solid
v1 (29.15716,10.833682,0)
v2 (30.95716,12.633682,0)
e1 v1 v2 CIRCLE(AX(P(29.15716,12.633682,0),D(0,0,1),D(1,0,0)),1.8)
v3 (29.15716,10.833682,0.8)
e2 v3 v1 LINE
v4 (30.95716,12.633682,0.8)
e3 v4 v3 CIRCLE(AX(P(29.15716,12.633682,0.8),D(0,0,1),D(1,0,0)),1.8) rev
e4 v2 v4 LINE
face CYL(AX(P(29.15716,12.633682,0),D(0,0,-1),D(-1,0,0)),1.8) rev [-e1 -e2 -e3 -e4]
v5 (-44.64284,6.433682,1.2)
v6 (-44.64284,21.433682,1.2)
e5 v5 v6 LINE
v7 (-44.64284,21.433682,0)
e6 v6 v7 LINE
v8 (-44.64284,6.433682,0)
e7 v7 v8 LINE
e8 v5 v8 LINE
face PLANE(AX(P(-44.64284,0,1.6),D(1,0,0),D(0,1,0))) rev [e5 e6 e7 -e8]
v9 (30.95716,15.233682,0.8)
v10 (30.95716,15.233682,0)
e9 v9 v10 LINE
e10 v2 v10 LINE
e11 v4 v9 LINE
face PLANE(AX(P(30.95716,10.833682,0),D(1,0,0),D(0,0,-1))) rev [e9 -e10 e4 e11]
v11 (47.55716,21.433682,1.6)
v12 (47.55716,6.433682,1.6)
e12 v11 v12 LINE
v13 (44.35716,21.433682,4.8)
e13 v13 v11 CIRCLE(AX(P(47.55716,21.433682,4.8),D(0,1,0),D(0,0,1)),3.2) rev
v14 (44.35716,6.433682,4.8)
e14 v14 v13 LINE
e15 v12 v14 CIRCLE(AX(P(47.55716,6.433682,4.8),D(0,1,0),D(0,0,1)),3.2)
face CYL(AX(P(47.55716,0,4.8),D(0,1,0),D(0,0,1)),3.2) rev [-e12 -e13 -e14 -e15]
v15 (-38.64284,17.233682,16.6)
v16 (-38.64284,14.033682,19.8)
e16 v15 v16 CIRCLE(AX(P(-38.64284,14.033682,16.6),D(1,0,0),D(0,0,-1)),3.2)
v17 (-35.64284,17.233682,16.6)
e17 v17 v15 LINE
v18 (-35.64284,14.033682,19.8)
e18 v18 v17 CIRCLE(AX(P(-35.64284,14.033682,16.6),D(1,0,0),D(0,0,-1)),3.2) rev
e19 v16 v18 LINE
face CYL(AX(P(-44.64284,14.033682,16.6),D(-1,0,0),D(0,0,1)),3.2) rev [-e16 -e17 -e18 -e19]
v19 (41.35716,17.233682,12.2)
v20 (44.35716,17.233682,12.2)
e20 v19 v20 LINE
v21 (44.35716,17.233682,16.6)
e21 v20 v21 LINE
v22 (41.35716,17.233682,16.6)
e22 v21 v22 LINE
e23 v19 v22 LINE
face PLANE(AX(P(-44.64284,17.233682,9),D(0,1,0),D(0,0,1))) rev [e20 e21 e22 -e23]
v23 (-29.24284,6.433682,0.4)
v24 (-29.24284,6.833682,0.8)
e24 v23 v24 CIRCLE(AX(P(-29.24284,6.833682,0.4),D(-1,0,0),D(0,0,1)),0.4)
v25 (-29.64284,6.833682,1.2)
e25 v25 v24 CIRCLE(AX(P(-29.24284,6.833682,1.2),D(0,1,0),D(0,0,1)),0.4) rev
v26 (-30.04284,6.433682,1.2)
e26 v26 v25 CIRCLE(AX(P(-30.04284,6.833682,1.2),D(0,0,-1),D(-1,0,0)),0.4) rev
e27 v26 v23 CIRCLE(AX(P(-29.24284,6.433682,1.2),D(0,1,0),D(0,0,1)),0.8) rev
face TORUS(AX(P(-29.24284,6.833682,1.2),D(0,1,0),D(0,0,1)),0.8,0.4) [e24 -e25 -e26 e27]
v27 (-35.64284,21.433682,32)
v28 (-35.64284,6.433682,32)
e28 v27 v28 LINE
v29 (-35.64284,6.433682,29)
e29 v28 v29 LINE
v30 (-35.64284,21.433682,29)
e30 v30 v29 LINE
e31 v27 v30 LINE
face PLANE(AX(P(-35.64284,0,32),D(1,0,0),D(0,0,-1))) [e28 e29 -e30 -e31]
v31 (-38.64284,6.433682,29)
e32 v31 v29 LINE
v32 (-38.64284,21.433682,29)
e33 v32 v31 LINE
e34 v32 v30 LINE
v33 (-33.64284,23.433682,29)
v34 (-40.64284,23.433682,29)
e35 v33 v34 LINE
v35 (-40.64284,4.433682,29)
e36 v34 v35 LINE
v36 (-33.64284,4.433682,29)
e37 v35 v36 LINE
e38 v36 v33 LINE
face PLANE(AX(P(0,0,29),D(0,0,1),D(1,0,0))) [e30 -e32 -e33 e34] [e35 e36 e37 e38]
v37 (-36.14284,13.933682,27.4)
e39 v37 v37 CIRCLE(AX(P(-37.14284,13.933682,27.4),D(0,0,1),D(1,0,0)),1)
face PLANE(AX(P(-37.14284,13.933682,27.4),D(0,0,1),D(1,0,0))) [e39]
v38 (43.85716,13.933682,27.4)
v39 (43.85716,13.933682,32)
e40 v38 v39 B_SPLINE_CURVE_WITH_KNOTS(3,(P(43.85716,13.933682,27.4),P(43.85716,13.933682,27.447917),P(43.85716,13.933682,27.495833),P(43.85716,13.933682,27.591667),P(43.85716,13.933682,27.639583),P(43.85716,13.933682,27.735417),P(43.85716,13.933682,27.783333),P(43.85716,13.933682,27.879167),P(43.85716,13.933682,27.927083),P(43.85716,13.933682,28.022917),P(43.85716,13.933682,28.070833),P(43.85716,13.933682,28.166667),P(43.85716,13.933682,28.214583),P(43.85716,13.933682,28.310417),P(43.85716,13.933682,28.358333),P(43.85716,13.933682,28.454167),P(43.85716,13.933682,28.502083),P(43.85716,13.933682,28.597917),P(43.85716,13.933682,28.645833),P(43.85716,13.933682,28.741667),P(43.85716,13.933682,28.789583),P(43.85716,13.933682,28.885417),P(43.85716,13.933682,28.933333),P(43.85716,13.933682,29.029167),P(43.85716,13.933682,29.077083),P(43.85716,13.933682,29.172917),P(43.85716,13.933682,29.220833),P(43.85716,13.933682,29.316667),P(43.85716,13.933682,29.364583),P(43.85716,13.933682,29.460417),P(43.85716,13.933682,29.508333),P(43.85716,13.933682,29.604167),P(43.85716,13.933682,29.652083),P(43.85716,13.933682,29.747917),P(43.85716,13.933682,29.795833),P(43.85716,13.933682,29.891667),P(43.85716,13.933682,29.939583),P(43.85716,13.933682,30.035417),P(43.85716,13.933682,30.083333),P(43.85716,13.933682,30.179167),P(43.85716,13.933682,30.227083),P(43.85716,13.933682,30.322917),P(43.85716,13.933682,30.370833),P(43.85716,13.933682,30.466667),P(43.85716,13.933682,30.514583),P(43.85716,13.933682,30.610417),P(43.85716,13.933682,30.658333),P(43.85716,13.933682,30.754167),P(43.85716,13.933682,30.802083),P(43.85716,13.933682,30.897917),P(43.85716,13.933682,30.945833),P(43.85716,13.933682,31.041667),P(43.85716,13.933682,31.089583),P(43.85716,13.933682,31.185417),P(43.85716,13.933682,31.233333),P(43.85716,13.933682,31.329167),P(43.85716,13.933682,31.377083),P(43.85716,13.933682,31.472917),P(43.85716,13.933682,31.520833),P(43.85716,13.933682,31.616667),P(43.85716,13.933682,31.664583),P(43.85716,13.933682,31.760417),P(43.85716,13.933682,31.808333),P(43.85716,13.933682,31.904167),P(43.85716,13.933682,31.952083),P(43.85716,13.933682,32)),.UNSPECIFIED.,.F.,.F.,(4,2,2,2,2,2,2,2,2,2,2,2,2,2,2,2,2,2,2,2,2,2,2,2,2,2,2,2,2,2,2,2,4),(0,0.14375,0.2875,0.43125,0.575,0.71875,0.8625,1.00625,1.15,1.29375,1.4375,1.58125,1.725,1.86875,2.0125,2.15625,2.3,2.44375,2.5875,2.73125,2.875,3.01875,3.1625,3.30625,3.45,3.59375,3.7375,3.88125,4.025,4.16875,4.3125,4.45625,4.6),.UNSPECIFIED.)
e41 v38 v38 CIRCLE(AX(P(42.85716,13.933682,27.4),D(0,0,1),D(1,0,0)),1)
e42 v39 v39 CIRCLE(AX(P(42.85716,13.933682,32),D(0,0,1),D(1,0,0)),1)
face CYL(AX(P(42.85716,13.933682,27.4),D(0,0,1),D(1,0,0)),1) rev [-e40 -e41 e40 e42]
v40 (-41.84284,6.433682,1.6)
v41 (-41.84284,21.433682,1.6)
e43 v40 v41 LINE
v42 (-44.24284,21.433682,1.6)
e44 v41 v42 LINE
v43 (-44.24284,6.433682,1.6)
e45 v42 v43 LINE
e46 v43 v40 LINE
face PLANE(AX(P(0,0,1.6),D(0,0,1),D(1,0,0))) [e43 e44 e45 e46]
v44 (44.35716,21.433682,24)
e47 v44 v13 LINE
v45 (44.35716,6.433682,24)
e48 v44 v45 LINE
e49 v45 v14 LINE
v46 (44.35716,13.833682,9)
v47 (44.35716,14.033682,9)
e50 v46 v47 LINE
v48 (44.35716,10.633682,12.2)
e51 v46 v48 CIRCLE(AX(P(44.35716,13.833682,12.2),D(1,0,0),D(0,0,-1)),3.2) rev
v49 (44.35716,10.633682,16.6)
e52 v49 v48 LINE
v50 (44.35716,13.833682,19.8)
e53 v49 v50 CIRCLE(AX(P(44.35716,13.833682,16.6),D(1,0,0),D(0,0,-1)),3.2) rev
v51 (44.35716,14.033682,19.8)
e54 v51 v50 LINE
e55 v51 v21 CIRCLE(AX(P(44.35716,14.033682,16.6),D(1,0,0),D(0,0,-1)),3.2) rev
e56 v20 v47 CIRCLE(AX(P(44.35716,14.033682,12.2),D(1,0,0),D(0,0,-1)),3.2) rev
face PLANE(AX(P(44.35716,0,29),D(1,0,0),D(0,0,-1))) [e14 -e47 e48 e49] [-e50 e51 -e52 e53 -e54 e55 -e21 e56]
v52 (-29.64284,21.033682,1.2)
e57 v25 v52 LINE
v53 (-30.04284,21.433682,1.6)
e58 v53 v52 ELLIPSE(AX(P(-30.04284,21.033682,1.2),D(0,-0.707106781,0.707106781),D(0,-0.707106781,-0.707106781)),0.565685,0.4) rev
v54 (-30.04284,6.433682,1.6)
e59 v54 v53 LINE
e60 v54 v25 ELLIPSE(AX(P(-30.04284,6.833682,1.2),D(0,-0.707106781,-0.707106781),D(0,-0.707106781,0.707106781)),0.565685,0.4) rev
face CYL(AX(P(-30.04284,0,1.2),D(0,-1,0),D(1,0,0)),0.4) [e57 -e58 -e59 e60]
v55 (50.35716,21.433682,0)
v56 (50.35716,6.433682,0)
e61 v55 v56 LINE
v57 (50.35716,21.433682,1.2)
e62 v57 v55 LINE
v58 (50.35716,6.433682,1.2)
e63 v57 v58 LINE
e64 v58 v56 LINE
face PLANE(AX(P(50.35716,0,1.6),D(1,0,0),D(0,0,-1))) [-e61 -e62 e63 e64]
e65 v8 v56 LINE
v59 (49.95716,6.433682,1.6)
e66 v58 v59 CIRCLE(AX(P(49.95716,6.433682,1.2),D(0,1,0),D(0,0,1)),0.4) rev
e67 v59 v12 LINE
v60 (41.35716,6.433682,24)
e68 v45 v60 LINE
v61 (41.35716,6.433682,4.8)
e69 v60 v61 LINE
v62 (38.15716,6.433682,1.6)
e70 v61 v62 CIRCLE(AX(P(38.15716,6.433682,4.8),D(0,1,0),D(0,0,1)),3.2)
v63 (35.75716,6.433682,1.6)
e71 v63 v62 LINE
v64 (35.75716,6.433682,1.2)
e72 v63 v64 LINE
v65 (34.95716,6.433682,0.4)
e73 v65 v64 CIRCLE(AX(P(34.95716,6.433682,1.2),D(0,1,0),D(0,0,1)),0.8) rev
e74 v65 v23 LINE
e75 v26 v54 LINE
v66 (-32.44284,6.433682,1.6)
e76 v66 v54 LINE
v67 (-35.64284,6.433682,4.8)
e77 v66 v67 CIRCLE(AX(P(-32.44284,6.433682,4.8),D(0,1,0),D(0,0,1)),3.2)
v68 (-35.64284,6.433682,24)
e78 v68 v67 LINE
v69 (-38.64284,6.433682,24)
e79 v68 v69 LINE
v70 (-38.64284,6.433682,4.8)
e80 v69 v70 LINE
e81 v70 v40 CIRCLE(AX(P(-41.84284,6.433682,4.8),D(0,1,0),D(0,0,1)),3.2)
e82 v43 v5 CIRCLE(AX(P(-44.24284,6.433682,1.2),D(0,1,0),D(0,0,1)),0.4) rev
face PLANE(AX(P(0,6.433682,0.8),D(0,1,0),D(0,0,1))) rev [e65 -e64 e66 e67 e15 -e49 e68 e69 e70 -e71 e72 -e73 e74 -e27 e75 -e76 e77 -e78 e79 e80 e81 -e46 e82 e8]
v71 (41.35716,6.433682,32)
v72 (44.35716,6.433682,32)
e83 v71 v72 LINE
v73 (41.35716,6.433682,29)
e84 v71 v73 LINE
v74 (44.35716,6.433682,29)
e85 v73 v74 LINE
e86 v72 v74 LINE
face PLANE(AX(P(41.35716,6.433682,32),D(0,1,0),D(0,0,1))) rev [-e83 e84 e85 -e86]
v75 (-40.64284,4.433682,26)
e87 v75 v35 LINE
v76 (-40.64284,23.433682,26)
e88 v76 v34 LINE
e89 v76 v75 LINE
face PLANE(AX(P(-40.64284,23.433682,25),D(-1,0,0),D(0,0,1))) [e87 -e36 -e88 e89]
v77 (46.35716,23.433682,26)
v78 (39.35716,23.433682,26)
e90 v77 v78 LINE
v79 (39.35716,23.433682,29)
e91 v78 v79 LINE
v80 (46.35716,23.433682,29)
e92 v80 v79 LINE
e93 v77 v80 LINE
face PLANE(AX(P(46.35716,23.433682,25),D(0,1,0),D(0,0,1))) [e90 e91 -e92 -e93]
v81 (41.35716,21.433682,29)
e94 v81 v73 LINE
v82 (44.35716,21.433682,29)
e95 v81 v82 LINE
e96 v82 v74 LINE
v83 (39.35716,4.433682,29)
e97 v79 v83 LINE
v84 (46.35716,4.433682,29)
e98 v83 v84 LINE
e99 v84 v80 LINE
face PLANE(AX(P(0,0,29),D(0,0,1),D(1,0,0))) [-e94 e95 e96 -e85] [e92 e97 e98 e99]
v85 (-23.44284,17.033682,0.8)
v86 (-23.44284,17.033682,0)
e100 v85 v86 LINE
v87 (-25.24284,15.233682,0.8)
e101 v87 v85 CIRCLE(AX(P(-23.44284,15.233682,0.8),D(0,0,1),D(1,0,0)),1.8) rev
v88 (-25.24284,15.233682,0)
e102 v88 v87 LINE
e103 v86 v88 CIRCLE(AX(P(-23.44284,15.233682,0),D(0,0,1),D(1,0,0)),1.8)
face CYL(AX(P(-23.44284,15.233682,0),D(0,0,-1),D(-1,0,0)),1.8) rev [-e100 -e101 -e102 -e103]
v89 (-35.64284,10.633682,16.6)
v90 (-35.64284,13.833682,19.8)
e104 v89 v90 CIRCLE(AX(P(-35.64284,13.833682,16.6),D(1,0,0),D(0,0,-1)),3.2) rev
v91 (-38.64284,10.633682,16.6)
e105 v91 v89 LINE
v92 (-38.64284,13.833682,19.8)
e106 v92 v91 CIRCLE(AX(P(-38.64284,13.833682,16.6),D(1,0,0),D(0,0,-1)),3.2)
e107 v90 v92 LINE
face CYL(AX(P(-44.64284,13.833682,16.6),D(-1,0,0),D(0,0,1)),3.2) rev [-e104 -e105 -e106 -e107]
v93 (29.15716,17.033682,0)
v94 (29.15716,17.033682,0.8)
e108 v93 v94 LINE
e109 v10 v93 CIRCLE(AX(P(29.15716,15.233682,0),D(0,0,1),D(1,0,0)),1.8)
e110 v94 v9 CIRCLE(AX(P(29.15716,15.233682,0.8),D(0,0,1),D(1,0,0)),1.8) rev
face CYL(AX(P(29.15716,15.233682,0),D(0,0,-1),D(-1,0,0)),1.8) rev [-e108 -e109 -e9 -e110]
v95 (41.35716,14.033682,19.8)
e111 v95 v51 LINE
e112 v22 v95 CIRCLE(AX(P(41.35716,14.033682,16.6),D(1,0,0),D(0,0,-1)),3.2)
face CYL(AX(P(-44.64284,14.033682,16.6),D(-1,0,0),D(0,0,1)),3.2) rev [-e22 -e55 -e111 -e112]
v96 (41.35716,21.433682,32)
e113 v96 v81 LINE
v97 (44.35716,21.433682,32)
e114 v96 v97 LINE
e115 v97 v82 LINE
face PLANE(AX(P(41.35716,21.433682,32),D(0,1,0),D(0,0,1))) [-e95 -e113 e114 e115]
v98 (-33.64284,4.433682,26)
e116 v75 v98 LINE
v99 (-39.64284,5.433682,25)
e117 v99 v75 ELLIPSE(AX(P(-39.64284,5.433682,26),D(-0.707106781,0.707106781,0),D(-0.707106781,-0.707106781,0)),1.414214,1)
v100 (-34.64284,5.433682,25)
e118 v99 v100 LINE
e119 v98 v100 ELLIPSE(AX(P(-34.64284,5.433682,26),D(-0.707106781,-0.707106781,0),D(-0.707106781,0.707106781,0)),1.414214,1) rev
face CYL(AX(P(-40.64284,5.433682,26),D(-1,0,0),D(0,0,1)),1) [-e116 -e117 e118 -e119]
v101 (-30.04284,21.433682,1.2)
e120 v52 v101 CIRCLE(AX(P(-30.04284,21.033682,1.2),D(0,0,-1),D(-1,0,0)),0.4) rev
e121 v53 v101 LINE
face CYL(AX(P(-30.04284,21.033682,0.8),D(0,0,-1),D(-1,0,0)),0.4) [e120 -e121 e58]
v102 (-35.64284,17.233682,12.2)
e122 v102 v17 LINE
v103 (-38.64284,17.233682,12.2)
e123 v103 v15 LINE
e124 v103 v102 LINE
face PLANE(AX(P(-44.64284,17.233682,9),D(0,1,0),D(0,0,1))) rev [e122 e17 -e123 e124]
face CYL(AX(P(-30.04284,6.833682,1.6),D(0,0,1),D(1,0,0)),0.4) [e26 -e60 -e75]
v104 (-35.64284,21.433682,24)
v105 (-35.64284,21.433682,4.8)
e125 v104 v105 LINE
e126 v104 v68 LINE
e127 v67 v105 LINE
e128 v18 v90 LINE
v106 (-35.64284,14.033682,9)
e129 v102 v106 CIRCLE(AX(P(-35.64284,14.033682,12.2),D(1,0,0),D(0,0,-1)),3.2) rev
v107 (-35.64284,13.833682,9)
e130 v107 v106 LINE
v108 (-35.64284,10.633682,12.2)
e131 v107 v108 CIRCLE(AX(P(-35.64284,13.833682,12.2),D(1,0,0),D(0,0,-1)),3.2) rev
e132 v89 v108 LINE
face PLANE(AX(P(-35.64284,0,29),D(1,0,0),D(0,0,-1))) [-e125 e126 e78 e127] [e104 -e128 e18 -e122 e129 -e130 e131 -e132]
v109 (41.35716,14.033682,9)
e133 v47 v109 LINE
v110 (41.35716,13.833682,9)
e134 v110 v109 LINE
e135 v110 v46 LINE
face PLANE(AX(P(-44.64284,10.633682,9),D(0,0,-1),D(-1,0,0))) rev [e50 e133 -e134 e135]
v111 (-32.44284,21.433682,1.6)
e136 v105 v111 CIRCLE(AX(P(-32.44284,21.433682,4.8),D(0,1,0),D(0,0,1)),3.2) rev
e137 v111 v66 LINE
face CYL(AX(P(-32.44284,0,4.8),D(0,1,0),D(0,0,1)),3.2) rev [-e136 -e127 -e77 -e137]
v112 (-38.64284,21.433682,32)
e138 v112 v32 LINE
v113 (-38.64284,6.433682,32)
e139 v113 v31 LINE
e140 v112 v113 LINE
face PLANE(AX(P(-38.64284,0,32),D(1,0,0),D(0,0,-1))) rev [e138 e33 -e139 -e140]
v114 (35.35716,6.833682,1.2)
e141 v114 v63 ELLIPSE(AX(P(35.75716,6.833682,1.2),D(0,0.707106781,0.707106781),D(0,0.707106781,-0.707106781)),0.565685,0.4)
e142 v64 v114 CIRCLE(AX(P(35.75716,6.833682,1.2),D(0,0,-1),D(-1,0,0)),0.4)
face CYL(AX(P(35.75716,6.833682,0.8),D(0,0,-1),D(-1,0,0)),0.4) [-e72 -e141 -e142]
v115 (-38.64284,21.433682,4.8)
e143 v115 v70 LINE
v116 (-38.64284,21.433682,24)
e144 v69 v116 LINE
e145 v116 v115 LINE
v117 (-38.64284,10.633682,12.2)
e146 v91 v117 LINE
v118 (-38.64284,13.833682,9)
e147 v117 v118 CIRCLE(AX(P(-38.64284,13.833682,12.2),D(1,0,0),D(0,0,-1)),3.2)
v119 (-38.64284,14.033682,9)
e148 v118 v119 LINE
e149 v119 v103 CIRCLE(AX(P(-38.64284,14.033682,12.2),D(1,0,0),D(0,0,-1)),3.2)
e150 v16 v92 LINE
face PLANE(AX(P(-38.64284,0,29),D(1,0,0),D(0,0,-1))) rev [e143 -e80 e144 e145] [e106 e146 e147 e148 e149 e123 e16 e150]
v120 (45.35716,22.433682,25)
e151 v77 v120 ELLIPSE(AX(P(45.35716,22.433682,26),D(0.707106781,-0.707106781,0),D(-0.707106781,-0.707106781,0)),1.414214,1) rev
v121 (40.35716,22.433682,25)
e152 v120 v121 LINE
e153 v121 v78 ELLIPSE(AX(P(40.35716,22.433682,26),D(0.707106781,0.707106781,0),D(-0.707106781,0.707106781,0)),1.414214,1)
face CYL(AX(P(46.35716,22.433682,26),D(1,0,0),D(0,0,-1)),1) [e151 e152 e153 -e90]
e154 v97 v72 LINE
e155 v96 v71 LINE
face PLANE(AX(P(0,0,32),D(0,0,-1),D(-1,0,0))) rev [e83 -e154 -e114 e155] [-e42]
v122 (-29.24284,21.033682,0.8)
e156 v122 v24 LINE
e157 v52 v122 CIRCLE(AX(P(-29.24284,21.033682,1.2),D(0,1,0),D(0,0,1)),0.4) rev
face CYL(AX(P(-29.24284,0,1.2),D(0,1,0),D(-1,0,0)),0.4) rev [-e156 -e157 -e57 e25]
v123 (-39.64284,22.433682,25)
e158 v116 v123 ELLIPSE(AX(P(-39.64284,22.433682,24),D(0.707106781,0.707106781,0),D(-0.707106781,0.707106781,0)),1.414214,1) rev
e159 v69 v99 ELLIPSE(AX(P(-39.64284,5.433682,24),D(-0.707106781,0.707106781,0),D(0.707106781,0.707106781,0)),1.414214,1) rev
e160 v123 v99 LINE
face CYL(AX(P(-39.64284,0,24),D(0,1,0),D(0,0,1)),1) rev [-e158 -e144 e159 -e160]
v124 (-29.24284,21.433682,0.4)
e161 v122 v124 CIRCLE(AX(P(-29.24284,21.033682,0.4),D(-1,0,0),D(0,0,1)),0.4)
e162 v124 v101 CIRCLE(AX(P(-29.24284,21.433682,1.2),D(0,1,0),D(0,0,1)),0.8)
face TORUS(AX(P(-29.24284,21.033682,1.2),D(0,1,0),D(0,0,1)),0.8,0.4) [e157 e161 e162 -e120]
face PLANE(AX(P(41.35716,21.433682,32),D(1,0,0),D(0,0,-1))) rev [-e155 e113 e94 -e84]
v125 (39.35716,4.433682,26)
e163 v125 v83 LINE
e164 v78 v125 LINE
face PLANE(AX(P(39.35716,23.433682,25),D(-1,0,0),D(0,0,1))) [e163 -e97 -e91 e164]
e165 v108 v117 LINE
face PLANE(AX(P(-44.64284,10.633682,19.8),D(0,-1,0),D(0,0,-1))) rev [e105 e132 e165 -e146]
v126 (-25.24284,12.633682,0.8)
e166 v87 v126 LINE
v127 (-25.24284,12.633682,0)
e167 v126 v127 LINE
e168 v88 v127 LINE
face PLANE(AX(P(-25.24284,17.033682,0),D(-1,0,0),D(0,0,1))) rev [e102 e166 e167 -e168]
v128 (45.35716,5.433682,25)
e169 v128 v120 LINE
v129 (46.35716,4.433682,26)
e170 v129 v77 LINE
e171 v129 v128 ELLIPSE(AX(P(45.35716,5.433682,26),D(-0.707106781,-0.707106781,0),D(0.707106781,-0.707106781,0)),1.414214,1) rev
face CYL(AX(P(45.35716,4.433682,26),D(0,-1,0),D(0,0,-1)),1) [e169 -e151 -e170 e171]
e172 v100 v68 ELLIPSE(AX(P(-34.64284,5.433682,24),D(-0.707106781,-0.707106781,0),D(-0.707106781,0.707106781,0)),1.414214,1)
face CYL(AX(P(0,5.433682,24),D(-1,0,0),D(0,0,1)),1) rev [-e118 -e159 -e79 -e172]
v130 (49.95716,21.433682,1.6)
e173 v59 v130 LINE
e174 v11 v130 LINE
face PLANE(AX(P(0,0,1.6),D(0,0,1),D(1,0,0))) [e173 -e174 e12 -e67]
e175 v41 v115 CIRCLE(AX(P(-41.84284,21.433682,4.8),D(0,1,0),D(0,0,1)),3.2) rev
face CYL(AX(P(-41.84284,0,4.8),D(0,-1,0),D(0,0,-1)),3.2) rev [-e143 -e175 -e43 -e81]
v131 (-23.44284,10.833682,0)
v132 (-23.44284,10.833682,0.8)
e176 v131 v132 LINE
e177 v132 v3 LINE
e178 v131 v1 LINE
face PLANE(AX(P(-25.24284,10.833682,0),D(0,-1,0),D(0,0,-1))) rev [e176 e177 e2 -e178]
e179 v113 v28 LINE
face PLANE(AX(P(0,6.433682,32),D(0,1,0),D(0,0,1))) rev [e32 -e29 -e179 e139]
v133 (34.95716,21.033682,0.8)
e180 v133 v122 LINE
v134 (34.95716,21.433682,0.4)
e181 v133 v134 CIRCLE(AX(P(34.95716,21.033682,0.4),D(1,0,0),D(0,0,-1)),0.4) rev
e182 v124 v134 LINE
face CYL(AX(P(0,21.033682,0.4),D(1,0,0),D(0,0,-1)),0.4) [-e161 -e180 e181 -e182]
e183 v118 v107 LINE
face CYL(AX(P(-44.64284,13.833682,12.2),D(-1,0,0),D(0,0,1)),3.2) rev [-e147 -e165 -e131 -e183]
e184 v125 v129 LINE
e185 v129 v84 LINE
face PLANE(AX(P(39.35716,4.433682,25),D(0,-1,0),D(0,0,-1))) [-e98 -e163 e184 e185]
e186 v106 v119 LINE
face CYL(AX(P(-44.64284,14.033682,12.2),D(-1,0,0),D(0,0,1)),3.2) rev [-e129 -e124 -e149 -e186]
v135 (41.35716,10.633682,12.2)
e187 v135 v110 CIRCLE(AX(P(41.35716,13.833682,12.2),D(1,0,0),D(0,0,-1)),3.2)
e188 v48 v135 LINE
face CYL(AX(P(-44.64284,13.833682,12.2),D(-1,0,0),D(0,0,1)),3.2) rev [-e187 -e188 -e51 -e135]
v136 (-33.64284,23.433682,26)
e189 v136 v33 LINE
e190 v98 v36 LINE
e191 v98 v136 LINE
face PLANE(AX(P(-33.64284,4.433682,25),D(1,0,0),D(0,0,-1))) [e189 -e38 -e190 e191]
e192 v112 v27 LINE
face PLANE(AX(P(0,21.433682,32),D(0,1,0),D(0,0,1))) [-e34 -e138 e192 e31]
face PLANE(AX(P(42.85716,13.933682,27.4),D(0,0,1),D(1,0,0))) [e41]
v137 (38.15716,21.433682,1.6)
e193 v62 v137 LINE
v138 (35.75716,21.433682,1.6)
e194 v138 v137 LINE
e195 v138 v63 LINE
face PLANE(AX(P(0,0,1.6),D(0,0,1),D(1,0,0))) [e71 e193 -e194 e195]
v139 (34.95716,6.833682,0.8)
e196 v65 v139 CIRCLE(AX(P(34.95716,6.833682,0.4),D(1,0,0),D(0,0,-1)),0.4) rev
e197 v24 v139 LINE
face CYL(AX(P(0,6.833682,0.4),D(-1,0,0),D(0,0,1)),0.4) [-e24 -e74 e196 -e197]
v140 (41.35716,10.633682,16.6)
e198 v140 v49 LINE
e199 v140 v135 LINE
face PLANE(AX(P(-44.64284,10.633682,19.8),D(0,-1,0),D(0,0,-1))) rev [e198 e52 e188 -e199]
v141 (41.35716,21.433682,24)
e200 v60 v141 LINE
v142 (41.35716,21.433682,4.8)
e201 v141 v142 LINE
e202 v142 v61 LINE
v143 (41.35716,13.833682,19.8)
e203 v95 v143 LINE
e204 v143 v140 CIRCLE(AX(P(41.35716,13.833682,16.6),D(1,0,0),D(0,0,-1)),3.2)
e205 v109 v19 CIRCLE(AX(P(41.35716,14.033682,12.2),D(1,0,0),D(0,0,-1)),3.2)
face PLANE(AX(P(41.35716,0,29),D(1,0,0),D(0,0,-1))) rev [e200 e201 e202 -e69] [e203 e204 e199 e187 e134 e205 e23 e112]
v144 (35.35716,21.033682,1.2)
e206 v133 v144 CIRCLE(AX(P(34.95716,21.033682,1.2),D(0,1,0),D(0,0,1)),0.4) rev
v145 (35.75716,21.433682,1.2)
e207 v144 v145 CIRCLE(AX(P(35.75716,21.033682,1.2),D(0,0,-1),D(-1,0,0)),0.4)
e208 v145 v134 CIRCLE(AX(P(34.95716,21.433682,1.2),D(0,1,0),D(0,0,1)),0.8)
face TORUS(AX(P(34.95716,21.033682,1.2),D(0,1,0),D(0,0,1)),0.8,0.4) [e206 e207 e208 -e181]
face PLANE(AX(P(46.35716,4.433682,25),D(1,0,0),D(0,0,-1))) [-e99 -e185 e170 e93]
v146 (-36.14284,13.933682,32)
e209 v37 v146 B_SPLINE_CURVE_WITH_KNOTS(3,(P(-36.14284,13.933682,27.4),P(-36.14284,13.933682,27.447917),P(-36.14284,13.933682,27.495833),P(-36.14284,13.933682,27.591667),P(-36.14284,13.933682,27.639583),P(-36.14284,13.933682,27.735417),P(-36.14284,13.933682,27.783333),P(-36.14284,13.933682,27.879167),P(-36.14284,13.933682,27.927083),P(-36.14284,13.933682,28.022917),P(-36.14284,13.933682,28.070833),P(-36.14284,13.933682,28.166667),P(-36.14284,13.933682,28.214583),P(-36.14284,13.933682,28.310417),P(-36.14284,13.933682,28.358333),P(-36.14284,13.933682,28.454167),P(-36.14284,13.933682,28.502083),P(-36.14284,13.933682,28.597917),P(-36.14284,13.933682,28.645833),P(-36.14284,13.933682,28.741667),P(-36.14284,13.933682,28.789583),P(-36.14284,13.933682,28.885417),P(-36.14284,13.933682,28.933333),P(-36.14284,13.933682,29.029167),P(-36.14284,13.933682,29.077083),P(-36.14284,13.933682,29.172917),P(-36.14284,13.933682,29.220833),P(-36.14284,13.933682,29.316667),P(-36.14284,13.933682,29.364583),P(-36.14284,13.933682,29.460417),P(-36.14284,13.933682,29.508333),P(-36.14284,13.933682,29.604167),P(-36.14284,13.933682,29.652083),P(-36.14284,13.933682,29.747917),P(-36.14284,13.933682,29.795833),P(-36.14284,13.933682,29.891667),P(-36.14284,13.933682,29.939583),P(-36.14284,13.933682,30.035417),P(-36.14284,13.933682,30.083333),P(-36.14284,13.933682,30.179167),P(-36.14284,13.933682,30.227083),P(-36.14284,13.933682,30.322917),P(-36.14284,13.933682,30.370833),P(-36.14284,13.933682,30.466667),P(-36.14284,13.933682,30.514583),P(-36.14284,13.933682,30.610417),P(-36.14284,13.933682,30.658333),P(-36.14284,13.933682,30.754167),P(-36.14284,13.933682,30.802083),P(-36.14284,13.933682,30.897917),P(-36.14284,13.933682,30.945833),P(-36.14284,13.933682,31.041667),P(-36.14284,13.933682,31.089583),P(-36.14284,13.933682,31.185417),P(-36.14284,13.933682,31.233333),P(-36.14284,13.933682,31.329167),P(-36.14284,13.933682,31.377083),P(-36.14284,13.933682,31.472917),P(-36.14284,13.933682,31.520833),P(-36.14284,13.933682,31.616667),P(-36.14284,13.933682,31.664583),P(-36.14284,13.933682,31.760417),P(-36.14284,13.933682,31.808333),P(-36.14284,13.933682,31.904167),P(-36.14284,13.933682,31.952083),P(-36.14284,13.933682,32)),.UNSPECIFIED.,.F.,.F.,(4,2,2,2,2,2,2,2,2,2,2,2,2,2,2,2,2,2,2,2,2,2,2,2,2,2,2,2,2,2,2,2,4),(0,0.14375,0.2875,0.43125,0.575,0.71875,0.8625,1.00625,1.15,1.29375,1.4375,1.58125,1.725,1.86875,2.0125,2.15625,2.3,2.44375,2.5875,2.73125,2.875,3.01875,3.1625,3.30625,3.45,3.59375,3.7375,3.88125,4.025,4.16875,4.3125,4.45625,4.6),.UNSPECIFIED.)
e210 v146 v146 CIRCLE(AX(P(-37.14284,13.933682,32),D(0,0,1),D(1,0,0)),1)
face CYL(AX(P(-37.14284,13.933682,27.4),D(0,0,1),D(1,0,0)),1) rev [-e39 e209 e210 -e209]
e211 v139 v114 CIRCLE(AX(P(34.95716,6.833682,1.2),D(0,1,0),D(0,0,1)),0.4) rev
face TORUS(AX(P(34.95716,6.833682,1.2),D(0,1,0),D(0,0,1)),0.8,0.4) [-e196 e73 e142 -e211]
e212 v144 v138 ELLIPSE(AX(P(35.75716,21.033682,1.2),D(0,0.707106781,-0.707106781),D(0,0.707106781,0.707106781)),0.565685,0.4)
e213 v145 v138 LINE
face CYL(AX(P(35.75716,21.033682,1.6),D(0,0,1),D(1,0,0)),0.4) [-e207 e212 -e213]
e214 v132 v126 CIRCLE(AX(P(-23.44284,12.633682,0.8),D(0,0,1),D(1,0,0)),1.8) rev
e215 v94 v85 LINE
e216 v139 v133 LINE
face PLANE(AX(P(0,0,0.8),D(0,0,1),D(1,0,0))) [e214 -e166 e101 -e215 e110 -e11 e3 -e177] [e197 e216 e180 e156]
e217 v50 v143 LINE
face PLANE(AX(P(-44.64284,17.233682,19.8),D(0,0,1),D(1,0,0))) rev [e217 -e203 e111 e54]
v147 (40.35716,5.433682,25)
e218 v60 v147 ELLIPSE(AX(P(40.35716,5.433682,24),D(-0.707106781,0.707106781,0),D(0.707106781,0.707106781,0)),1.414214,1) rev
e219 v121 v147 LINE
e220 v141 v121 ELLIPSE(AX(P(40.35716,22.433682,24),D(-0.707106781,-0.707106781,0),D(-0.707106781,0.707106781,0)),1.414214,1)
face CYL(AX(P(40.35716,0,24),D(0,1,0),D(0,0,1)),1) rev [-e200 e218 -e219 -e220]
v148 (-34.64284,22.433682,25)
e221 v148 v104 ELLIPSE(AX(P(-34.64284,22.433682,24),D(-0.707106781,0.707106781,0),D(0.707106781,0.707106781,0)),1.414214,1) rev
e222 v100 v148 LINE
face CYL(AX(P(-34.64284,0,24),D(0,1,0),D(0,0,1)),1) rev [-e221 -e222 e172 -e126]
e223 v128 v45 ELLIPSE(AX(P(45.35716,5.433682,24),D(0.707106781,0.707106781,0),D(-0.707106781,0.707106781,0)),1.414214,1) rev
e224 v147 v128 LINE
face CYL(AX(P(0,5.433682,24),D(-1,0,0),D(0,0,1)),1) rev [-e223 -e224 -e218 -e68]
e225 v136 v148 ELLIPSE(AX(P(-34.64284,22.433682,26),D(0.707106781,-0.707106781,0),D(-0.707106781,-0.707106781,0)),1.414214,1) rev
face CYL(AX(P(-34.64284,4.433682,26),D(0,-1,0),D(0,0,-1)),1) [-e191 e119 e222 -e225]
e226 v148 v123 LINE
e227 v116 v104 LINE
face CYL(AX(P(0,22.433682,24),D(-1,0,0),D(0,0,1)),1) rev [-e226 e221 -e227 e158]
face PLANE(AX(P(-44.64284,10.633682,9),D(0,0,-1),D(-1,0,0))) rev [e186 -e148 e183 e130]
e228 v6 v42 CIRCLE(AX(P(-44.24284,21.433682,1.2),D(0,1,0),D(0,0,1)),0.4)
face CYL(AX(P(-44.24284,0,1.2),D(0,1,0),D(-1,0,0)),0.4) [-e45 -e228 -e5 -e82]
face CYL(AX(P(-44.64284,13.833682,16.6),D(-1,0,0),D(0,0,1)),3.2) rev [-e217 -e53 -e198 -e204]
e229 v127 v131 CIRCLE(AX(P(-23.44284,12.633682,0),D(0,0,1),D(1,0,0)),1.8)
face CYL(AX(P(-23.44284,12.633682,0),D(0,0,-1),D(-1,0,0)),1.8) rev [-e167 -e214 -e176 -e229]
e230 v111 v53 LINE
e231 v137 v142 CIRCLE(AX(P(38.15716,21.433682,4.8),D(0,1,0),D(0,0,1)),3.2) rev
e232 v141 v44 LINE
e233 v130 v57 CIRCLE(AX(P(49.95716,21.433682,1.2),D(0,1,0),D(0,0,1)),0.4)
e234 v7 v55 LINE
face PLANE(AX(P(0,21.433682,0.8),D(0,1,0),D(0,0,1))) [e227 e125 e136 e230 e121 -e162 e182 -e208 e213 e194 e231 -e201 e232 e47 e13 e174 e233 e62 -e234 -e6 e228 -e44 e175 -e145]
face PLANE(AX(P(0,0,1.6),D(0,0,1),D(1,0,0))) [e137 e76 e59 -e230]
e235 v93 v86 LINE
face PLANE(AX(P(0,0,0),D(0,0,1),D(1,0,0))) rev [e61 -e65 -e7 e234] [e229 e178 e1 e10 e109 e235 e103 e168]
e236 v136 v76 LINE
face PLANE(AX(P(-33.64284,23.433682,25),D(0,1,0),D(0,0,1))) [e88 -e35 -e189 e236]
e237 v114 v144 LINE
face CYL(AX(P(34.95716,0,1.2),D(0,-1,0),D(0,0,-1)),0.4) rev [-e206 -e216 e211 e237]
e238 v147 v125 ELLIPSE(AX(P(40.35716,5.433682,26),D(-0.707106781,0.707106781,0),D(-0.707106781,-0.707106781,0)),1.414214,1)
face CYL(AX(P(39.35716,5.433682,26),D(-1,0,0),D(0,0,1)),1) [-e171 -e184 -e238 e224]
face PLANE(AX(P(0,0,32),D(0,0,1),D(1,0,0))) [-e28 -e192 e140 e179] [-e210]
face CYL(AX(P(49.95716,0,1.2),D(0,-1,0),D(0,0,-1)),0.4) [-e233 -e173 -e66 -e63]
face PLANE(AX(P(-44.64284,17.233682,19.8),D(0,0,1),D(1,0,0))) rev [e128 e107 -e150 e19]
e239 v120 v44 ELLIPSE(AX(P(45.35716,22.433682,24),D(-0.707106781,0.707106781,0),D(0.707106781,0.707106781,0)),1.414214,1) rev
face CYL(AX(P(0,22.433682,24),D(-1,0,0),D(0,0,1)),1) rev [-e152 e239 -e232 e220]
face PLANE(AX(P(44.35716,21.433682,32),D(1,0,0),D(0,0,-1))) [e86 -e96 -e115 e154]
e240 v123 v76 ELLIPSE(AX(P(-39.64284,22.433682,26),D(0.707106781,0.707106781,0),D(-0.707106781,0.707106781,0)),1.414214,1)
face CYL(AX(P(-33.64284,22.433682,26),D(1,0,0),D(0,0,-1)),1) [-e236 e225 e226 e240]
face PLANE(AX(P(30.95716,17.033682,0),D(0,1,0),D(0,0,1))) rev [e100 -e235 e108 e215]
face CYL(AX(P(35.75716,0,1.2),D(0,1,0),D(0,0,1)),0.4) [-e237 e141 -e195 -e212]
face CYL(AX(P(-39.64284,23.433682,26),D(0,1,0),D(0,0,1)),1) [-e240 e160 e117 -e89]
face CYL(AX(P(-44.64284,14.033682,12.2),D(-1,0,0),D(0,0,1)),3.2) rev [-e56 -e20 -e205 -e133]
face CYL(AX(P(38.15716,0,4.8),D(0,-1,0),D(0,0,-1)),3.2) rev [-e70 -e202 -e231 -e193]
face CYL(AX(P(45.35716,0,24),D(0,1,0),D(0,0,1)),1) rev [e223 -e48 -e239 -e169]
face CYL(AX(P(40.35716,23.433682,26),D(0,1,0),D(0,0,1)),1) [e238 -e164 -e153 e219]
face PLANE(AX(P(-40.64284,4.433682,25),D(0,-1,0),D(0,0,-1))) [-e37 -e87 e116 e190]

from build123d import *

# Parameters (mm, degrees)
SKETCH1_W           = 65
SKETCH1_H           = 15
BOSS_EXTRUDE1_DEPTH = 0.8
SKETCH1_3_W         = 6
SKETCH1_3_H         = 15
BOSS_EXTRUDE2_DEPTH = 1.6
BOSS_EXTRUDE3_DEPTH = 29
SKETCH2_W           = 7
SKETCH2_H           = 19
SKETCH2_W_2         = 3
SKETCH2_H_2         = 15
BOSS_EXTRUDE4_DEPTH = 4
SKETCH2_2_W         = 3
SKETCH2_2_H         = 15
BOSS_EXTRUDE5_DEPTH = 3
SKETCH3_R           = 1
CUT_EXTRUDE1_DEPTH  = 4.6
FILLET1_R           = 3.2
FILLET2_R           = 0.4
FILLET3_R           = 1
SKETCH4_W           = 56.2
SKETCH4_H           = 6.2
CUT_EXTRUDE2_DEPTH  = 64.705737631
FILLET4_R           = 1.8
SKETCH5_W           = 10.8
SKETCH5_H           = 6.6
CUT_EXTRUDE3_DEPTH  = 98.437864541
FILLET5_R           = 3.2


with BuildPart() as part:
    # Sketch1 → Boss-Extrude1 (new body)
    with BuildSketch(Plane.XY):
        with Locations((2.857159974, 13.933681879)):
            Rectangle(SKETCH1_W, SKETCH1_H)
    extrude(amount=BOSS_EXTRUDE1_DEPTH)

    # Sketch1<3> → Boss-Extrude2 (add)
    with BuildSketch(Plane.XY):
        with Locations((-32.642840026, 13.933681879)):
            Rectangle(SKETCH1_3_W, SKETCH1_3_H)
        with Locations((-41.642840026, 13.933681879)):
            Rectangle(SKETCH1_3_W, SKETCH1_3_H)
        with Locations((38.357159974, 13.933681879)):
            Rectangle(SKETCH1_3_W, SKETCH1_3_H)
        with Locations((47.357159974, 13.933681879)):
            Rectangle(SKETCH1_3_W, SKETCH1_3_H)
    extrude(amount=BOSS_EXTRUDE2_DEPTH)


with BuildPart() as boss_extrude2_piece_1:
    # of the separate pieces the step leaves, piece 1, a body of its own (boss_extrude2_pieces)
    add(part.part.solids().sort_by_distance((41.357159974, 21.433681879, 0))[0])



with BuildPart() as boss_extrude2_piece_2:
    # of the separate pieces the step leaves, piece 2, a body of its own (boss_extrude2_pieces)
    add(part.part.solids().sort_by_distance((50.357159974, 6.433681879, 0))[0])


with BuildPart() as boss_extrude2_piece_3:
    # of the separate pieces the step leaves, piece 3, a body of its own (boss_extrude2_pieces)
    add(part.part.solids().sort_by_distance((-38.642840026, 6.433681879, 0))[0])


with BuildPart() as boss_extrude2_piece_1_1:
    add(boss_extrude2_piece_1.part)

    add(boss_extrude2_piece_2.part)  # Boss-Extrude3 merges Boss-Extrude2 piece 2

    add(boss_extrude2_piece_3.part)  # Boss-Extrude3 merges Boss-Extrude2 piece 3
    # Sketch1<4> → Boss-Extrude3 (add)
    with BuildSketch(Plane.XY):
        Polygon((-35.642840026, 6.433681879), (-35.642840026, 21.433681879), (-37.142840026, 21.433681879), (-38.642840026, 21.433681879), (-38.642840026, 6.433681879), (-37.142840026, 6.433681879), align=None)
        Polygon((42.857159974, 21.433681879), (41.357159974, 21.433681879), (41.357159974, 6.433681879), (42.857159974, 6.433681879), (44.357159974, 6.433681879), (44.357159974, 21.433681879), align=None)
    extrude(amount=BOSS_EXTRUDE3_DEPTH)

    # Sketch2 → Boss-Extrude4 (add)
    # profile 1 of 2: a face of its own
    with BuildSketch(Plane.XY.offset(29)):
        with Locations((-37.142840026, 13.933681879)):
            Rectangle(SKETCH2_W, SKETCH2_H)
        with Locations((-37.142840026, 13.933681879)):
            Rectangle(SKETCH2_W_2, SKETCH2_H_2, mode=Mode.SUBTRACT)
    # profile 2 of 2: a face of its own
    with BuildSketch(Plane.XY.offset(29)):
        with Locations((42.857159974, 13.933681879)):
            Rectangle(SKETCH2_W, SKETCH2_H)
        with Locations((42.857159974, 13.933681879)):
            Rectangle(SKETCH2_W_2, SKETCH2_H_2, mode=Mode.SUBTRACT)
    extrude(amount=-BOSS_EXTRUDE4_DEPTH)

    # Sketch2<2> → Boss-Extrude5 (add)
    with BuildSketch(Plane.XY.offset(29)):
        with Locations((-37.142840026, 13.933681879)):
            Rectangle(SKETCH2_2_W, SKETCH2_2_H)
        with Locations((42.857159974, 13.933681879)):
            Rectangle(SKETCH2_2_W, SKETCH2_2_H)
    extrude(amount=BOSS_EXTRUDE5_DEPTH)

    # Sketch3 → Cut-Extrude1 (cut)
    with BuildSketch(Plane.XY.offset(32)):
        with Locations((-37.142840026, 13.933681879)):
            Circle(SKETCH3_R)
        with Locations((42.857159974, 13.933681879)):
            Circle(SKETCH3_R)
    extrude(amount=-CUT_EXTRUDE1_DEPTH, mode=Mode.SUBTRACT)

    # Fillet1
    fillet1_edges = [boss_extrude2_piece_1_1.edges().sort_by_distance(p)[0] for p in [
        (44.357159974, 13.933681879, 1.6),
        (41.357159974, 13.933681879, 1.6),
        (-35.642840026, 13.933681879, 1.6),
        (-38.642840026, 13.933681879, 1.6),
    ]]
    fillet(fillet1_edges, radius=FILLET1_R)

    # Fillet2
    fillet2_edges = [boss_extrude2_piece_1_1.edges().sort_by_distance(p)[0] for p in [
        (-29.642840026, 21.433681879, 1.2),
        (35.357159974, 21.433681879, 1.2),
        (-29.642840026, 6.433681879, 1.2),
        (35.357159974, 6.433681879, 1.2),
        (2.857159974, 21.433681879, 0.8),
        (2.857159974, 6.433681879, 0.8),
        (50.357159974, 13.933681879, 1.6),
        (35.357159974, 13.933681879, 0.8),
        (35.357159974, 13.933681879, 1.6),
        (-29.642840026, 13.933681879, 0.8),
        (-29.642840026, 13.933681879, 1.6),
        (-44.642840026, 13.933681879, 1.6),
    ]]
    fillet(fillet2_edges, radius=FILLET2_R - 0.0001)  # a hair under: the kernel refuses the full size

    # Fillet3
    fillet3_edges = [boss_extrude2_piece_1_1.edges().sort_by_distance(p)[0] for p in [
        (-37.142840026, 23.433681879, 25),
        (-40.642840026, 13.933681879, 25),
        (-33.642840026, 13.933681879, 25),
        (-37.142840026, 4.433681879, 25),
        (42.857159974, 23.433681879, 25),
        (39.357159974, 13.933681879, 25),
        (42.857159974, 4.433681879, 25),
        (46.357159974, 13.933681879, 25),
        (42.857159974, 6.433681879, 25),
        (41.357159974, 13.933681879, 25),
        (42.857159974, 21.433681879, 25),
        (44.357159974, 13.933681879, 25),
        (-37.142840026, 21.433681879, 25),
        (-35.642840026, 13.933681879, 25),
        (-37.142840026, 6.433681879, 25),
        (-38.642840026, 13.933681879, 25),
    ]]
    fillet(fillet3_edges, radius=FILLET3_R - 0.0001)  # a hair under: the kernel refuses the full size

    # Sketch4 → Cut-Extrude2 (cut, through all)
    with BuildSketch(Plane.XY.offset(0.8)):
        with Locations((2.857159974, 13.933681879)):
            Rectangle(SKETCH4_W, SKETCH4_H)
    extrude(amount=-CUT_EXTRUDE2_DEPTH, mode=Mode.SUBTRACT)

    # Fillet4
    fillet4_edges = [boss_extrude2_piece_1_1.edges().sort_by_distance(p)[0] for p in [
        (30.957159974, 10.833681879, 0.4),
        (-25.242840026, 10.833681879, 0.4),
        (-25.242840026, 17.033681879, 0.4),
        (30.957159974, 17.033681879, 0.4),
    ]]
    fillet(fillet4_edges, radius=FILLET4_R)

    # Sketch5 → Cut-Extrude3 (cut, through all)
    with BuildSketch(Plane(origin=(44.357159974, 0, 0), x_dir=(0, 0, -1), z_dir=(1, 0, 0))):
        with Locations((-14.4, 13.933681879)):
            Rectangle(SKETCH5_W, SKETCH5_H)
    extrude(amount=-CUT_EXTRUDE3_DEPTH, mode=Mode.SUBTRACT)

    # Fillet5
    fillet5_edges = [boss_extrude2_piece_1_1.edges().sort_by_distance(p)[0] for p in [
        (-37.142840026, 17.233681879, 9),
        (42.857159974, 17.233681879, 9),
        (-37.142840026, 10.633681879, 9),
        (42.857159974, 10.633681879, 9),
        (-37.142840026, 10.633681879, 19.8),
        (42.857159974, 10.633681879, 19.8),
        (-37.142840026, 17.233681879, 19.8),
        (42.857159974, 17.233681879, 19.8),
    ]]
    fillet(fillet5_edges, radius=FILLET5_R)


solid = boss_extrude2_piece_1_1.part
